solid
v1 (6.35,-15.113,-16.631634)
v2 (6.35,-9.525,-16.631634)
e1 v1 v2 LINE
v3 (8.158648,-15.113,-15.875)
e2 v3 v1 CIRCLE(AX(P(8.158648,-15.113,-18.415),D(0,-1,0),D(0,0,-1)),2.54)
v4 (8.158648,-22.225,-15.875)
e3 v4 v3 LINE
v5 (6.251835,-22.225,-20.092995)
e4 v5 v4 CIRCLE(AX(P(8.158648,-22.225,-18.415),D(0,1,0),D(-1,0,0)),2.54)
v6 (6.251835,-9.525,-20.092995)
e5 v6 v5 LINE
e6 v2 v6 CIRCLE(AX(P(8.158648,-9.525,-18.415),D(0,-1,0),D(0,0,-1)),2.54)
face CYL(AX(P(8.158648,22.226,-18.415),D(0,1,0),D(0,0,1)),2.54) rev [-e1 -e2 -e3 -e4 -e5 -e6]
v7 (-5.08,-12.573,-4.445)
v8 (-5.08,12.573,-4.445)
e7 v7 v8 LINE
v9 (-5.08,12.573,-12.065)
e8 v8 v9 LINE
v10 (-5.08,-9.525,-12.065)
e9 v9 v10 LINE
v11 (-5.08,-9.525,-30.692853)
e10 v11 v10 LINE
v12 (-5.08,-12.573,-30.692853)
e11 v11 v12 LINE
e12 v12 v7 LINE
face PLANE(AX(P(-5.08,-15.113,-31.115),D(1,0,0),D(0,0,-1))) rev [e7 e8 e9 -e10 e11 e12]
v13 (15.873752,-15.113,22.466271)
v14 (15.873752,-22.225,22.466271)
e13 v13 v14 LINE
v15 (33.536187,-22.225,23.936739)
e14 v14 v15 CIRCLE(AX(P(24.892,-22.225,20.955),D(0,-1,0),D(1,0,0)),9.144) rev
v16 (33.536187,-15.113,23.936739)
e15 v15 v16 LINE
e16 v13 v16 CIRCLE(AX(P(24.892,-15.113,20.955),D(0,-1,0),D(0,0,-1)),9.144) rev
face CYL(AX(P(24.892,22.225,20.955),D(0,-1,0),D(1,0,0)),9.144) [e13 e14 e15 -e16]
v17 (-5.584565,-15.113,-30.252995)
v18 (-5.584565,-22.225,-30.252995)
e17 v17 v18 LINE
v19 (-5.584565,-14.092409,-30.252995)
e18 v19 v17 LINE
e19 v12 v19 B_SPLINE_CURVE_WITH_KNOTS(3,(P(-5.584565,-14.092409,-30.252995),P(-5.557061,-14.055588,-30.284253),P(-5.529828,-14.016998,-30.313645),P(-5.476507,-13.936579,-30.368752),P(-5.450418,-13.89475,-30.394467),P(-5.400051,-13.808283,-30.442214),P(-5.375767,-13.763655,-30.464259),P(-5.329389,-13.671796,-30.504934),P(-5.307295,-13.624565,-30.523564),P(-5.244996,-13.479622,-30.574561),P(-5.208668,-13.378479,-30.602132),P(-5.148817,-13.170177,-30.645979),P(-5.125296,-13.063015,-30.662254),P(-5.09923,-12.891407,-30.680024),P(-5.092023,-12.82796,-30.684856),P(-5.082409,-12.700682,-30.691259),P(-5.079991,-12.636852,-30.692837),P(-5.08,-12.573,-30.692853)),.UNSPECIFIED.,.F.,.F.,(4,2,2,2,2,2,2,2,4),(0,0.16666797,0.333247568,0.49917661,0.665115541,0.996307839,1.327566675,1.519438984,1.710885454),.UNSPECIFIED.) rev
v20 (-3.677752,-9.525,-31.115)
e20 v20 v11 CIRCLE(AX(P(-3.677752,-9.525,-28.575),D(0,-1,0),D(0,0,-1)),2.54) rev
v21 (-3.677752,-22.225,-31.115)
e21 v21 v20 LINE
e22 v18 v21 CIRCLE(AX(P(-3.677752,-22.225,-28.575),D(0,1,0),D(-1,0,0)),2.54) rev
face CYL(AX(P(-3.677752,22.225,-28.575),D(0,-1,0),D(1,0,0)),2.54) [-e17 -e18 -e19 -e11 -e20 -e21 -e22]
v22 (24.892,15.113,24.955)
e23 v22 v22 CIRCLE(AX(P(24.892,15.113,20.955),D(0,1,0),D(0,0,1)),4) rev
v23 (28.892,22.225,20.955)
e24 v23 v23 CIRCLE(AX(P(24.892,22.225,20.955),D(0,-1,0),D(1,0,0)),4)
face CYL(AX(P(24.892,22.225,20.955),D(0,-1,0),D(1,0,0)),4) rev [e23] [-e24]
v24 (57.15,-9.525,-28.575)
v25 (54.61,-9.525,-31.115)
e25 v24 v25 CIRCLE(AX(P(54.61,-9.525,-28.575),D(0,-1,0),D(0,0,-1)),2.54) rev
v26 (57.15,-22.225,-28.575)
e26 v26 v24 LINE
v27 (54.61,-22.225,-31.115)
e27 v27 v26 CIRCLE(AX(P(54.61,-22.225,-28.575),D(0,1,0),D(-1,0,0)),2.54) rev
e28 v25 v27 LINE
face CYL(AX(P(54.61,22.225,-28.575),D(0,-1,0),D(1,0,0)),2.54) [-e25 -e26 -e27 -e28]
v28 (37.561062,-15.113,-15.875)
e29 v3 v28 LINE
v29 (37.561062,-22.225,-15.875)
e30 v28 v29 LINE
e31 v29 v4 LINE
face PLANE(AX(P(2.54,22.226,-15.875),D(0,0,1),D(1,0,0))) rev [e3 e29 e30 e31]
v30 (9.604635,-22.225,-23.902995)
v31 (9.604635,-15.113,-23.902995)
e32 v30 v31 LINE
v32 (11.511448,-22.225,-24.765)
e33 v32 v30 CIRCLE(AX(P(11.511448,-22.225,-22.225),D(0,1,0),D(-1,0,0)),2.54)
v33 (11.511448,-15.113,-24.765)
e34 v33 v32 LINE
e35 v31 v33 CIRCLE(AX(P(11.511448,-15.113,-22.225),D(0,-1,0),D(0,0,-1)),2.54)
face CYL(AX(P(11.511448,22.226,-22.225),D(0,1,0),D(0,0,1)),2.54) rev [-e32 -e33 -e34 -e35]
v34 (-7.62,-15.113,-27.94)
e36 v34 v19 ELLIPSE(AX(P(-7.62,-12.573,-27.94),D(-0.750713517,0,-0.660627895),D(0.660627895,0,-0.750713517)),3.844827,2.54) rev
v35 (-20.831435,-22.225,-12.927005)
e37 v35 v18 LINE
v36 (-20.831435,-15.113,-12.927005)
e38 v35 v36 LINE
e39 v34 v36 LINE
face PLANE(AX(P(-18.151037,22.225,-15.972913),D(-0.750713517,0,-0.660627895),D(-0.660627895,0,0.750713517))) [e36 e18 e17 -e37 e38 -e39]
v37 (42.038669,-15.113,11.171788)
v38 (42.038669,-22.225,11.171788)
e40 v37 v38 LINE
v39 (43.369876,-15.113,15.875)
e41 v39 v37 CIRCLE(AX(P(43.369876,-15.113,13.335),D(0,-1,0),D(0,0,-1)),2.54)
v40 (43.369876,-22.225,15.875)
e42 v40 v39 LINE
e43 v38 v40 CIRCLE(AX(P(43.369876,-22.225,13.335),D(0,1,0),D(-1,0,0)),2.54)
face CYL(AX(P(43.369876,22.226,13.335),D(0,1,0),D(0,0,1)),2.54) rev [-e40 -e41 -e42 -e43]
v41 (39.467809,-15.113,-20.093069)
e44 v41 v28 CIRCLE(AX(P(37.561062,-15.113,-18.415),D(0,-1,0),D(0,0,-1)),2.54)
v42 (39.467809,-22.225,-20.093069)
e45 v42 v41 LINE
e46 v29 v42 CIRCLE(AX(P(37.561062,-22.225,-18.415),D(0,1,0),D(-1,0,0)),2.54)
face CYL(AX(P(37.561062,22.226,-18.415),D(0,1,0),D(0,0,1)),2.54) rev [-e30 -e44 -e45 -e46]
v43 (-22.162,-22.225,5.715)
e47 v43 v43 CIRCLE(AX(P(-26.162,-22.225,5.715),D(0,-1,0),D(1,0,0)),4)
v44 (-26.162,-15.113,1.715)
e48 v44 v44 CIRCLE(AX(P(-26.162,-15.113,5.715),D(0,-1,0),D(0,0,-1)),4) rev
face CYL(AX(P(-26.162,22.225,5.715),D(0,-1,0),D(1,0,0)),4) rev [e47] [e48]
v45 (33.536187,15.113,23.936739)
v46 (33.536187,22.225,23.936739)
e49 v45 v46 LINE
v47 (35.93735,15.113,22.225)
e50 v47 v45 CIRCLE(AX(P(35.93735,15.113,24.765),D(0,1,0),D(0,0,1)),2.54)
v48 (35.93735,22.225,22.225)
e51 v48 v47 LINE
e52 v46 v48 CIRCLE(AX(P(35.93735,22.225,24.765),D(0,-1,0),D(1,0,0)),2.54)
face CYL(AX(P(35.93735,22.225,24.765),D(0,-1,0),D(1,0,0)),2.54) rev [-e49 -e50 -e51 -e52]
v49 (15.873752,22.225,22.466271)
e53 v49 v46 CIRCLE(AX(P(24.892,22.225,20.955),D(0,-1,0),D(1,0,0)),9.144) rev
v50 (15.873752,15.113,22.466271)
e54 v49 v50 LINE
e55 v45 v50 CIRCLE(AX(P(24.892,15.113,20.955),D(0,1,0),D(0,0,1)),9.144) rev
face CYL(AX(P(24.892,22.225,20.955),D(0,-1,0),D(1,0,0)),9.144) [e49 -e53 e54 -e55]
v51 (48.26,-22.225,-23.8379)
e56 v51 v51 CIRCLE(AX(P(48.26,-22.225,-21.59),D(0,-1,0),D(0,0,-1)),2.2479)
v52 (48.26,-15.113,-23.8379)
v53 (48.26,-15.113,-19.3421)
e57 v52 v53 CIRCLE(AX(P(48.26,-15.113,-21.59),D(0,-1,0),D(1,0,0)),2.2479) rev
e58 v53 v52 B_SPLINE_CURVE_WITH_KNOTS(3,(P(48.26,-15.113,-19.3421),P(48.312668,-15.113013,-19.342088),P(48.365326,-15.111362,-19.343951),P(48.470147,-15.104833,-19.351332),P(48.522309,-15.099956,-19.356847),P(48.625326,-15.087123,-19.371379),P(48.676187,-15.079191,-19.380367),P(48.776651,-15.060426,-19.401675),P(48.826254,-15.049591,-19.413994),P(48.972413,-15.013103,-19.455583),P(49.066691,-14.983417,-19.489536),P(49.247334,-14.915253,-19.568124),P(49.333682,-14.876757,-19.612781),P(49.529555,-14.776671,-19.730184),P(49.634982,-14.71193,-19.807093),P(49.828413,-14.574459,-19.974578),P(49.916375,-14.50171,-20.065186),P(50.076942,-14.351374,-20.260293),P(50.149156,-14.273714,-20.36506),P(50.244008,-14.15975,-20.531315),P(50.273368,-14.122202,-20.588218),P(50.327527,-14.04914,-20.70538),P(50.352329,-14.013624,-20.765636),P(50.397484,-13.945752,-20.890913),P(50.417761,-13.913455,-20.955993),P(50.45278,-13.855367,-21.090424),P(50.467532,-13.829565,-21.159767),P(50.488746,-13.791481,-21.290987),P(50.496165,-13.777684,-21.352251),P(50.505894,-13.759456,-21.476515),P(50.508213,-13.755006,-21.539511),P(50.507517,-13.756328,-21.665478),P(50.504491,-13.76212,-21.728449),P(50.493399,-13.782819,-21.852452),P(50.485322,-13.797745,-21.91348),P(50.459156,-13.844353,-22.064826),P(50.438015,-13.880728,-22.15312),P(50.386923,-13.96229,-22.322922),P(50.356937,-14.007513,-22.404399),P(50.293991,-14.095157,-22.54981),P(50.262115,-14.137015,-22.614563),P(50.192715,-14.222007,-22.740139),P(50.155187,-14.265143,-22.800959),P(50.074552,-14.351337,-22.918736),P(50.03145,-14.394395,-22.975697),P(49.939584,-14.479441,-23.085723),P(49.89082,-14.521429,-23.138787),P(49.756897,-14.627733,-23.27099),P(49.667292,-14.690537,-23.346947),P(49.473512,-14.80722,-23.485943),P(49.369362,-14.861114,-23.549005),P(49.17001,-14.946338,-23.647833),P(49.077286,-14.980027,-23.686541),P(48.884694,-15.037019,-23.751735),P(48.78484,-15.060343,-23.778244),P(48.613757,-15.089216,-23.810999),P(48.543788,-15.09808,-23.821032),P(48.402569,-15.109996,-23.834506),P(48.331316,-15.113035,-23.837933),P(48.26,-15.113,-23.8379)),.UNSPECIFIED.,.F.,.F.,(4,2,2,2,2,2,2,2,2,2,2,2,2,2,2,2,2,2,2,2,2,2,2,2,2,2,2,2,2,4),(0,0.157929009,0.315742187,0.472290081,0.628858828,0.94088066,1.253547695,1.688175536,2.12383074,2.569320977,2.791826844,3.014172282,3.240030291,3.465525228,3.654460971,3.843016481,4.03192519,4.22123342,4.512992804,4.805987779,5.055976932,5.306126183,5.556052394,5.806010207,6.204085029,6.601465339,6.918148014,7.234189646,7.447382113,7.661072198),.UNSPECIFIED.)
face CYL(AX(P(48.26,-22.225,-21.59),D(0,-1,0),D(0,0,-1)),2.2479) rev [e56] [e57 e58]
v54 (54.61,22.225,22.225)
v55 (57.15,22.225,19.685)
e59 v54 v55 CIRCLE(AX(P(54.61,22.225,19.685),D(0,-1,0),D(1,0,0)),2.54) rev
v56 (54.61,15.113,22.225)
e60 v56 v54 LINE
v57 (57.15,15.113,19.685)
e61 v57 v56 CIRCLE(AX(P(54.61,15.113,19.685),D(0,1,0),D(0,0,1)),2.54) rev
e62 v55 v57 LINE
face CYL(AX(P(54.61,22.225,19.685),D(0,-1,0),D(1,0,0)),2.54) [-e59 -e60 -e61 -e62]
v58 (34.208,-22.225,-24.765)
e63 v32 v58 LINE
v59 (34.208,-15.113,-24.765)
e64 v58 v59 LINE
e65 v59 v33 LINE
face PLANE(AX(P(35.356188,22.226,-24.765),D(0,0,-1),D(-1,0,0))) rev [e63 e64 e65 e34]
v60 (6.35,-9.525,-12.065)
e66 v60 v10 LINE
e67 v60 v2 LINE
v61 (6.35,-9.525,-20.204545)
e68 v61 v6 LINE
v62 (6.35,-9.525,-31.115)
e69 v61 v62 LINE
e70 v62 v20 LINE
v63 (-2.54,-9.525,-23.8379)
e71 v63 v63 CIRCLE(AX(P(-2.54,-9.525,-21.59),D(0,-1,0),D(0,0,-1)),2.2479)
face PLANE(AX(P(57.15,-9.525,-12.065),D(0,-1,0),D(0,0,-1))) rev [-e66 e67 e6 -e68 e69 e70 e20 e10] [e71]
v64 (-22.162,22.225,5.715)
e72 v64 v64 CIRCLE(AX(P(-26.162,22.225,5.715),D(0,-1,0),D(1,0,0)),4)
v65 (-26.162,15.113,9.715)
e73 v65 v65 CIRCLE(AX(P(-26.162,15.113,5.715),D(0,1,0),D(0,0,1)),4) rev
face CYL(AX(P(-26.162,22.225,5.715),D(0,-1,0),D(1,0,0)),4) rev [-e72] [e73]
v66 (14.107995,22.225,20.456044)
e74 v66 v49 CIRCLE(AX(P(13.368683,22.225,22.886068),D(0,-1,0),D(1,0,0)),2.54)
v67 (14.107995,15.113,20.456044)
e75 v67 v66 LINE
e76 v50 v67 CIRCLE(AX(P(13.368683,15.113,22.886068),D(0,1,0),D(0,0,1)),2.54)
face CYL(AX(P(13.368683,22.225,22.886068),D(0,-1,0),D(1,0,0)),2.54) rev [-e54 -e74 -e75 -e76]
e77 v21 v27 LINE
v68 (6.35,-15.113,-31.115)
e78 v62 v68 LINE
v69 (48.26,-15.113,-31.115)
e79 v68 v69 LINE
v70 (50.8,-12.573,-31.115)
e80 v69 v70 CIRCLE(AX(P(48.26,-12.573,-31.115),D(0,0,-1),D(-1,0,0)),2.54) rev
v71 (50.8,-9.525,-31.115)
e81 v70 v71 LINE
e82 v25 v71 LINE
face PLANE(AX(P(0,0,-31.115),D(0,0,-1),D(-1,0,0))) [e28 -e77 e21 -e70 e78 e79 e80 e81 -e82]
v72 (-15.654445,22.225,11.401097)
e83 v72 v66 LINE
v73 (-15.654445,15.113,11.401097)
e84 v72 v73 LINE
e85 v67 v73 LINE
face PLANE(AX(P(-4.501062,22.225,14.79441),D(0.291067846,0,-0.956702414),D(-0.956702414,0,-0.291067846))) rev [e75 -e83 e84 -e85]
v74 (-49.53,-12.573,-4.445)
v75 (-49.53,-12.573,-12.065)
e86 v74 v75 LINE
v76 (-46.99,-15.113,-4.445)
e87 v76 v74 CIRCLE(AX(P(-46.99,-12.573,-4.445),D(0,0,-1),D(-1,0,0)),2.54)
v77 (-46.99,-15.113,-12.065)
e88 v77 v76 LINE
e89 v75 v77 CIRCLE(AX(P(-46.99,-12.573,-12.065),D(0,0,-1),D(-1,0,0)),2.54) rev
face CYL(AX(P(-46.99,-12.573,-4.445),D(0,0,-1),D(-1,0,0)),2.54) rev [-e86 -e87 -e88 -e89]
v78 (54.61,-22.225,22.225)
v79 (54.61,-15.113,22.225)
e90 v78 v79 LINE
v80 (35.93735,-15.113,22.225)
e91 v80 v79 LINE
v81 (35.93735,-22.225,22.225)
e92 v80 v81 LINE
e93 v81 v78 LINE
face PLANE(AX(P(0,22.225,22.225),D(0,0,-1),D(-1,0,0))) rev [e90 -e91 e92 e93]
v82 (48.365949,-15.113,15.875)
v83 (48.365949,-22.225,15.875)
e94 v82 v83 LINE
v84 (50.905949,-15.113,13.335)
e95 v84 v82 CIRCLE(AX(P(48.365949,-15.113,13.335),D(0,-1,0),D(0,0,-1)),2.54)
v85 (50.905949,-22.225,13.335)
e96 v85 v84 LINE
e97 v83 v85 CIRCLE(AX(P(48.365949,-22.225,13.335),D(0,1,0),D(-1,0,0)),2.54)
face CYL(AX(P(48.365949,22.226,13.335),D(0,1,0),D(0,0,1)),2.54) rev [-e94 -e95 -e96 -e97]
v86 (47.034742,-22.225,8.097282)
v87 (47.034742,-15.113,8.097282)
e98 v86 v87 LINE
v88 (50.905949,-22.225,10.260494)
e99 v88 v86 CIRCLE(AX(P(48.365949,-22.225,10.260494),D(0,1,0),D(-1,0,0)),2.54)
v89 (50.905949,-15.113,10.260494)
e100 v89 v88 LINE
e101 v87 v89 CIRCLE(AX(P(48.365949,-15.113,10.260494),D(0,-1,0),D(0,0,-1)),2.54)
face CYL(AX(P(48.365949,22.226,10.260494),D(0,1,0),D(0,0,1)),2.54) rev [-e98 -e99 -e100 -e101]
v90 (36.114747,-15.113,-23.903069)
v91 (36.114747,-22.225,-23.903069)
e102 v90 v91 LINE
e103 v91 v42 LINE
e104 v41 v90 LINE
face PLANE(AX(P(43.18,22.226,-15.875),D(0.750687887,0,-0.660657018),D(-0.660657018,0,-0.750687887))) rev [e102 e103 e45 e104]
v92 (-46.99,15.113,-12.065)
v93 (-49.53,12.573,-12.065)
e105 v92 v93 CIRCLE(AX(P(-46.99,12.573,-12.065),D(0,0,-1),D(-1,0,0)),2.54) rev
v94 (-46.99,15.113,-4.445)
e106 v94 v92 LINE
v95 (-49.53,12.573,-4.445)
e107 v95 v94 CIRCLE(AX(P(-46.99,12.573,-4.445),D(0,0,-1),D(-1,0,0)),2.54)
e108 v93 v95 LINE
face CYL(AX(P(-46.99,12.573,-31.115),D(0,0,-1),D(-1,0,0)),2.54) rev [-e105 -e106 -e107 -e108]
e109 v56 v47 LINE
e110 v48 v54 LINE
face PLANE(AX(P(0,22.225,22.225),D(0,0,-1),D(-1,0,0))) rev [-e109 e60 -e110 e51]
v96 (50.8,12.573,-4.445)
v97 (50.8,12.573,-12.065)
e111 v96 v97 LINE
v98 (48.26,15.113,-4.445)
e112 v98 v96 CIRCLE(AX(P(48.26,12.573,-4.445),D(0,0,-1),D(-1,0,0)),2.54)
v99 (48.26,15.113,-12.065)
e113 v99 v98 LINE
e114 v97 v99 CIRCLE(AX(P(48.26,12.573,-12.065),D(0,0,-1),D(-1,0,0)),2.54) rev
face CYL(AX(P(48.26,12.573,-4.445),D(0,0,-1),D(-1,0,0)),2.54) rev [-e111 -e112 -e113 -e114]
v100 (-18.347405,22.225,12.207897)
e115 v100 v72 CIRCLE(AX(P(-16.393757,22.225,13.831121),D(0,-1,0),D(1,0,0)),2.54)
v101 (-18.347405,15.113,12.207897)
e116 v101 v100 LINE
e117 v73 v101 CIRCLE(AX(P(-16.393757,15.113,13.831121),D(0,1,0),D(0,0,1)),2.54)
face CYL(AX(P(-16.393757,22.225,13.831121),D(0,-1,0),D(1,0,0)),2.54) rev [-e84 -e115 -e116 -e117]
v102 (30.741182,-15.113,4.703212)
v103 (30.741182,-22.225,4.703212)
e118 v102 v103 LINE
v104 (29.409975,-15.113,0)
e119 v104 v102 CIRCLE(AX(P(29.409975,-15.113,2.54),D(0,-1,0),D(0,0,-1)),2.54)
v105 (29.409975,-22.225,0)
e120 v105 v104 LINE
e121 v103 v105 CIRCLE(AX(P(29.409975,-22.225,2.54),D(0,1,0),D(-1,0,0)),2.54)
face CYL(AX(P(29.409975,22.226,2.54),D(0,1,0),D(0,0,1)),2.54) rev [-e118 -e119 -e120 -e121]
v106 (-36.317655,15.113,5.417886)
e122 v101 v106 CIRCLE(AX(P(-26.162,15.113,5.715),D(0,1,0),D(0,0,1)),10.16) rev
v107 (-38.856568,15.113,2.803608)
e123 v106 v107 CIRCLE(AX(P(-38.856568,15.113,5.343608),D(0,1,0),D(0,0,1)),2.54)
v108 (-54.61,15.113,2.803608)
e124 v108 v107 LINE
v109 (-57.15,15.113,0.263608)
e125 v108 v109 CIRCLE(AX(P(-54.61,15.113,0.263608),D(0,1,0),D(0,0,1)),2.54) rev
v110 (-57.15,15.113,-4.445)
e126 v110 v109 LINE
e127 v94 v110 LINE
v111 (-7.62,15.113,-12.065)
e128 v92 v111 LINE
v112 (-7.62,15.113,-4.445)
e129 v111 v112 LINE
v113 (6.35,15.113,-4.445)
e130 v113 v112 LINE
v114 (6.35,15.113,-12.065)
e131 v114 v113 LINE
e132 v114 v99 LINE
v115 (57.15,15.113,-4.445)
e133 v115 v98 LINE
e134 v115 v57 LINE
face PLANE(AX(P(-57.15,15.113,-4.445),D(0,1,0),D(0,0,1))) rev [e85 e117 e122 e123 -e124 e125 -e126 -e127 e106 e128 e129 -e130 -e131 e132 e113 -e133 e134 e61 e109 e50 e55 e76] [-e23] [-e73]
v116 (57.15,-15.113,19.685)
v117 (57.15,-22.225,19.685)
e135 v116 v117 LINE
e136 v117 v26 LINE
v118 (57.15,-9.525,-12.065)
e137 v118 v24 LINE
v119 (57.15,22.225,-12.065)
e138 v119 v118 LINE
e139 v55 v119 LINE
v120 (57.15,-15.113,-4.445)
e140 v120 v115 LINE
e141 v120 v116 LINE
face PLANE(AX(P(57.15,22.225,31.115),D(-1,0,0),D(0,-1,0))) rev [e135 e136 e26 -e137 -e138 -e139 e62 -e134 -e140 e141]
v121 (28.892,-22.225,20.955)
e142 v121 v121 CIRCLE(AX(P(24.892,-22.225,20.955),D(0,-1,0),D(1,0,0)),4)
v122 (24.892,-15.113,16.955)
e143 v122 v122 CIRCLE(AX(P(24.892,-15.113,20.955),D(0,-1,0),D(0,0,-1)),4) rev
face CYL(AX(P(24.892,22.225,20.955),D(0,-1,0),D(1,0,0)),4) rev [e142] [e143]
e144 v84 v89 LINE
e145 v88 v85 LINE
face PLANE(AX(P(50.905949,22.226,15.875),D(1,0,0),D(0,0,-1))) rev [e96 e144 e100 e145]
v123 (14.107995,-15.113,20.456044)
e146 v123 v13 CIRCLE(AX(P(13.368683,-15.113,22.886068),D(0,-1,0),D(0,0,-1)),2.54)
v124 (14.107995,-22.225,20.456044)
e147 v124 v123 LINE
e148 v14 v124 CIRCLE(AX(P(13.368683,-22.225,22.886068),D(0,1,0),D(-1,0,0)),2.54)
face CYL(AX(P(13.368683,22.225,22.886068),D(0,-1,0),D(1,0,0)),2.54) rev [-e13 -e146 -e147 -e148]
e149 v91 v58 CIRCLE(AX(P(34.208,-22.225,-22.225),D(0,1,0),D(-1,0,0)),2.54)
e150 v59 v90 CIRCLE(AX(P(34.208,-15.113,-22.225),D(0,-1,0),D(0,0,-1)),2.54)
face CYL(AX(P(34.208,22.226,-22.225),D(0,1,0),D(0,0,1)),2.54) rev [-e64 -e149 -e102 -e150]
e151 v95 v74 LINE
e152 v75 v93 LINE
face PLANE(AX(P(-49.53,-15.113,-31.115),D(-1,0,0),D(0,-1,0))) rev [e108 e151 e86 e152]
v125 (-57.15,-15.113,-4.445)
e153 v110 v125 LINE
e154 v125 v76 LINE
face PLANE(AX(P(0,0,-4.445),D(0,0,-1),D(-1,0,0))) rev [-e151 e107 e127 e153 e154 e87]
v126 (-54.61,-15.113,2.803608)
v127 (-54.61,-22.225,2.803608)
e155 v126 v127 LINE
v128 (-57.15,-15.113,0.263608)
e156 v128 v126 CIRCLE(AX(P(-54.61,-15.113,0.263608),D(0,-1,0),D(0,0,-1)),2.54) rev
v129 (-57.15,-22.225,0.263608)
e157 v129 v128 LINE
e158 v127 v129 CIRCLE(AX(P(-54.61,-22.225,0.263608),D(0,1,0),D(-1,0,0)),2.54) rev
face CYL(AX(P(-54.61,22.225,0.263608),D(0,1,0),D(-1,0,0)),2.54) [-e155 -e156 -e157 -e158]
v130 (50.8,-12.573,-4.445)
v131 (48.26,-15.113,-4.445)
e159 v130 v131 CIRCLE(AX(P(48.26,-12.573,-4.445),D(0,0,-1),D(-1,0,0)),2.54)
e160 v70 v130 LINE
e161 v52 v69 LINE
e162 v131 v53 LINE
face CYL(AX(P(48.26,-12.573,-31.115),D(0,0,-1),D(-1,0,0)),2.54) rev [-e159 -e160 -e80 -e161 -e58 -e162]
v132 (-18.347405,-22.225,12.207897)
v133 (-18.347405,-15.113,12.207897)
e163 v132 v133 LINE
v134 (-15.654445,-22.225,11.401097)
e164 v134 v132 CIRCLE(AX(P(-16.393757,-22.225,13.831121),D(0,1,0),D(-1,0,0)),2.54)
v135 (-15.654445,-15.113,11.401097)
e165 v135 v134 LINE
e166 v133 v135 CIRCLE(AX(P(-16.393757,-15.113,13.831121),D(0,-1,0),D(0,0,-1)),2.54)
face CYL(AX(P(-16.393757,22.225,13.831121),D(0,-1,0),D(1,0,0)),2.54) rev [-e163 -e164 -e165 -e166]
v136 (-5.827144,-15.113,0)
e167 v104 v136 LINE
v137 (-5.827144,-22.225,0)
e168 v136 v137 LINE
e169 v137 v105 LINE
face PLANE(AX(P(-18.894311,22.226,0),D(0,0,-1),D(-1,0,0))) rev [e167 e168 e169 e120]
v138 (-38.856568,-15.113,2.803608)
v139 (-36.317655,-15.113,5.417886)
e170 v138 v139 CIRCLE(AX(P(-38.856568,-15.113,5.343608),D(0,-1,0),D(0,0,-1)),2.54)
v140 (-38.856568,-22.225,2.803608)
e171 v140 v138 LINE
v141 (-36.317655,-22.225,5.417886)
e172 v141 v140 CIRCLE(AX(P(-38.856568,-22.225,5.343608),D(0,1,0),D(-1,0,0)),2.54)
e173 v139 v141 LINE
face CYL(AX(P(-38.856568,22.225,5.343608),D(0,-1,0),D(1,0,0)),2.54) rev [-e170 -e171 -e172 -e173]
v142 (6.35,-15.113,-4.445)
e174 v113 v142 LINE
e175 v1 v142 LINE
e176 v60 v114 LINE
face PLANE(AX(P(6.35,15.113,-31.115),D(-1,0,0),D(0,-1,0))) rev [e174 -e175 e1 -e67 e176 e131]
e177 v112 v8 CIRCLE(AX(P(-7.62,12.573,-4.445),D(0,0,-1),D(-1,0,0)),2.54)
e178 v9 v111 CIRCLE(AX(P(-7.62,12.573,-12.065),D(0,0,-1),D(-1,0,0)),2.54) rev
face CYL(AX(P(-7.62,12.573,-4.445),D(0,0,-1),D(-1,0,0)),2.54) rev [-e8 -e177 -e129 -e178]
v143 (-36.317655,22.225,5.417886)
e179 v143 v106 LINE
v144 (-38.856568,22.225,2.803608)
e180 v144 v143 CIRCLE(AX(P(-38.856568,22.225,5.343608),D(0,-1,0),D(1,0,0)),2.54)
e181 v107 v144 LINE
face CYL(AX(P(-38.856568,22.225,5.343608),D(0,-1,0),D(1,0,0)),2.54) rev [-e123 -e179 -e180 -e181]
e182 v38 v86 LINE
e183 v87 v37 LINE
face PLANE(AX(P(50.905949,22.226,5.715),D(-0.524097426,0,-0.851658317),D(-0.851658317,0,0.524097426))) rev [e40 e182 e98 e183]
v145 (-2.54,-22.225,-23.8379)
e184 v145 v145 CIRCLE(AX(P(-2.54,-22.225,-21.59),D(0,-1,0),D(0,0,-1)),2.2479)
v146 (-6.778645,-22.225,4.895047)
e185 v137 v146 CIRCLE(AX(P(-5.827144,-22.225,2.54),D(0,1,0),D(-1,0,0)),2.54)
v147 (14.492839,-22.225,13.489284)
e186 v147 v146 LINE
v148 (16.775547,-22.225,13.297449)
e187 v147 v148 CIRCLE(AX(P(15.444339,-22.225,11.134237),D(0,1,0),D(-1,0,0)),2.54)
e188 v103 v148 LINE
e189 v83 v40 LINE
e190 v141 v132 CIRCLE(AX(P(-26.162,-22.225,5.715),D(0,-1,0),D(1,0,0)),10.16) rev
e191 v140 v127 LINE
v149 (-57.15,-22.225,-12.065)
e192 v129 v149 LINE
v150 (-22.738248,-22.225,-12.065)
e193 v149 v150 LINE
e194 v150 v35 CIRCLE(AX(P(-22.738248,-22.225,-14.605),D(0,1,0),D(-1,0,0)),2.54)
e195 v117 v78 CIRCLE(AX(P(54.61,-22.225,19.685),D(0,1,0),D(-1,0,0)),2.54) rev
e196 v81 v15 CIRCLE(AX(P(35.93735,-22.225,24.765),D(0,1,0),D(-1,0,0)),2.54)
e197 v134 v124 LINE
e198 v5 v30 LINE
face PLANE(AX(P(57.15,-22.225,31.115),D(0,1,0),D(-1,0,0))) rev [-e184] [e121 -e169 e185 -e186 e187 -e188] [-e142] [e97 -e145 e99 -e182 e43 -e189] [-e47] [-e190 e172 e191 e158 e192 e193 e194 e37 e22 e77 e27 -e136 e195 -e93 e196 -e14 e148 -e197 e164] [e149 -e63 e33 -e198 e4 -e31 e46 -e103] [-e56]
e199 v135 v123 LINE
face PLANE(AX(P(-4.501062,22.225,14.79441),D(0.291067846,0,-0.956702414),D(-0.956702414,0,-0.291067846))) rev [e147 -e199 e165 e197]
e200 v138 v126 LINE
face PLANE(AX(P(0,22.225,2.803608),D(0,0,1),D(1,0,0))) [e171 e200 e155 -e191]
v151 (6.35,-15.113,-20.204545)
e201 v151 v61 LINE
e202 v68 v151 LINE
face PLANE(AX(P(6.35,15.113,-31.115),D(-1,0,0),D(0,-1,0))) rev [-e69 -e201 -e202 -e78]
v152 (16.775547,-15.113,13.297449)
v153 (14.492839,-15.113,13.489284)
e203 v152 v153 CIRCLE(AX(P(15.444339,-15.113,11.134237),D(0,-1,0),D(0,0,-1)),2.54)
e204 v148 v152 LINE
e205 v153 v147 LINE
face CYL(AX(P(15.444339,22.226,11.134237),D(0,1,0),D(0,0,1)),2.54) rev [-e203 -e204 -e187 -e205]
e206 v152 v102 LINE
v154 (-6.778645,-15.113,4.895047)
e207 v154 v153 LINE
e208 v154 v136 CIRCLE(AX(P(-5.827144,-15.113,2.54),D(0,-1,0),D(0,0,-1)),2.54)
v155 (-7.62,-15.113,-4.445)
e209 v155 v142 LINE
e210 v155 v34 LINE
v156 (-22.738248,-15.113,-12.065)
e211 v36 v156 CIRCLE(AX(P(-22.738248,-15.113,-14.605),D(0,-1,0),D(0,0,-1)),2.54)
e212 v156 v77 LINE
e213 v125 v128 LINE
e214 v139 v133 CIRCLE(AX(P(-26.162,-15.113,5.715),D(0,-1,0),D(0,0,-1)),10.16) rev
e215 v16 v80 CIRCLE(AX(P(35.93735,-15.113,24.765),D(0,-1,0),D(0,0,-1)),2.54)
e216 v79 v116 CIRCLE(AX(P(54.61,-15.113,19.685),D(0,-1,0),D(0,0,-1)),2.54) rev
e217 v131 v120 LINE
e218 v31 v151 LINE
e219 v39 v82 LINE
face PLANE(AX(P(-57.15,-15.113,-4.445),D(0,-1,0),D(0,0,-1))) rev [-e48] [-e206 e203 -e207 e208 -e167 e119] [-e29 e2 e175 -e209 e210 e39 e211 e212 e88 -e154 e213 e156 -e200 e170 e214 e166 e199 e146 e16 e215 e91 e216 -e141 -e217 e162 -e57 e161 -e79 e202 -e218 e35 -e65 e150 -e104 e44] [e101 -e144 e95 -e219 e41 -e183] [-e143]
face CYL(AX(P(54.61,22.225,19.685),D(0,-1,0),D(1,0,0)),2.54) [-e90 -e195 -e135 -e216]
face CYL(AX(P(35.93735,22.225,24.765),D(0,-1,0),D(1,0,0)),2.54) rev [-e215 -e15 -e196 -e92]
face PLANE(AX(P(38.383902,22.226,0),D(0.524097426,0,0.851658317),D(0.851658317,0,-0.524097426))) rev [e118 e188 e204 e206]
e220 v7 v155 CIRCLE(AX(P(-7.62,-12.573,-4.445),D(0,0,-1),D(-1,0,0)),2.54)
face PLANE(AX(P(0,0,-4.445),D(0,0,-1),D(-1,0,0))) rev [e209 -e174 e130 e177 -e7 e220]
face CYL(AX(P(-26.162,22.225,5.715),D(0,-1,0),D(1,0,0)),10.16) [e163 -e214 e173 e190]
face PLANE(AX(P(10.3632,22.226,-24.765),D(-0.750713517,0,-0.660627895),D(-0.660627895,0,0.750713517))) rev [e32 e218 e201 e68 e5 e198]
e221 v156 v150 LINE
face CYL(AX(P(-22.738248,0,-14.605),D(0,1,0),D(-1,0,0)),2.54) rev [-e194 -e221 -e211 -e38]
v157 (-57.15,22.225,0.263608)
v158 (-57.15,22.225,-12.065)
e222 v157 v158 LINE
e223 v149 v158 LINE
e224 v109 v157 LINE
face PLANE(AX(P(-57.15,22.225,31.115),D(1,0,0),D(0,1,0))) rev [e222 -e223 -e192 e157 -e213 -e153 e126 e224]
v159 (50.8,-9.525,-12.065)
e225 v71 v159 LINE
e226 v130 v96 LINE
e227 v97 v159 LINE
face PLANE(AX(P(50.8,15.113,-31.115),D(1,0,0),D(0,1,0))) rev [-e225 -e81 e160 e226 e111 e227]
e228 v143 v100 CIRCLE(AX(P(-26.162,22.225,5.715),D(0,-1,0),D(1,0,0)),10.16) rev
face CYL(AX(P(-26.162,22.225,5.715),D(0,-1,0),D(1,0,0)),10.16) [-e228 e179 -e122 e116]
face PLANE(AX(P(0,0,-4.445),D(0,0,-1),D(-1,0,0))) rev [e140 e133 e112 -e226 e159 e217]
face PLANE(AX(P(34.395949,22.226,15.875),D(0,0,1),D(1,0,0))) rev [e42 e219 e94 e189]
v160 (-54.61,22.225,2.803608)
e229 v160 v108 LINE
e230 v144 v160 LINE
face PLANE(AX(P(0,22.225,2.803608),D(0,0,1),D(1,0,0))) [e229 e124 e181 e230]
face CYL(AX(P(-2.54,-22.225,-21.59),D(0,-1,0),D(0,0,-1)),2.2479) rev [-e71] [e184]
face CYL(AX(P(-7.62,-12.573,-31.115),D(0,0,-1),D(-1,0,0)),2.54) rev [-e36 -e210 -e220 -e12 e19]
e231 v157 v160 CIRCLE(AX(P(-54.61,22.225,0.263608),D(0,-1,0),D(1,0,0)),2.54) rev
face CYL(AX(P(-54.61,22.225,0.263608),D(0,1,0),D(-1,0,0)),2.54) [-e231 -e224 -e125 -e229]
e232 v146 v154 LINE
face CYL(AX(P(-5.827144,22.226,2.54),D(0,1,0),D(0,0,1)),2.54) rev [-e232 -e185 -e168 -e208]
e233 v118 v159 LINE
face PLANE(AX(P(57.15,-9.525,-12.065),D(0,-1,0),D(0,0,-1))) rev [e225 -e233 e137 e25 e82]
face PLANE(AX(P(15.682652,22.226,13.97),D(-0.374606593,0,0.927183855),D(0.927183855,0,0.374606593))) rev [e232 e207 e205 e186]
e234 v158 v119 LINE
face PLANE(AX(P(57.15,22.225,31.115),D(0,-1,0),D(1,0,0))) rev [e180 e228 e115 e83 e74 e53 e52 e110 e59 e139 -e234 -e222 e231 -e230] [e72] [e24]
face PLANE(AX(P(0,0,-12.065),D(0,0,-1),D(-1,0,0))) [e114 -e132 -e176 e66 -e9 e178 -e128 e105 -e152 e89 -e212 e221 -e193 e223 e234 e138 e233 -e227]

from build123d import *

# Parameters (mm, degrees)
SKETCH1_W                  = 114.3
SKETCH1_H                  = 44.45
BOSS_EXTRUDE1_DEPTH        = 31.115
SKETCH3_R                  = 4
PIVOT_POINTS_DEPTH         = 79.803986098
SKETCH4_W                  = 114.3
SKETCH4_H                  = 30.226
TOP_CUTOUT_DEPTH           = 35.56
SKETCH5_W                  = 114.3
SKETCH5_H                  = 31.75
BOTTOM_CUTOUT_DEPTH        = 19.05
SIDE_PROFILE_CUT_DEPTH     = 79.803986098
F_8_CLEARANCE_HOLE1_D      = 4.4958
OPTIMIZATION_CUTOUTS_DEPTH = 12.7
SKETCH12_W                 = 44.45
SKETCH12_H                 = 30.226
CUT_EXTRUDE7_DEPTH         = 71.380118364
FILLET2_R                  = 2.54


with BuildPart() as part:
    # Sketch1 → Boss-Extrude1 (new, symmetric)
    with BuildSketch(Plane.XY):
        Rectangle(SKETCH1_W, SKETCH1_H)
    extrude(amount=BOSS_EXTRUDE1_DEPTH, both=True)

    # Sketch3 → Pivot Points (cut, through all)
    with BuildSketch(Plane.XZ.offset(22.225)):
        with Locations((-26.162, 5.715)):
            Circle(SKETCH3_R)
        with Locations((24.892, 20.955)):
            Circle(SKETCH3_R)
    extrude(amount=-PIVOT_POINTS_DEPTH, mode=Mode.SUBTRACT)

    # Sketch4 → Top Cutout (cut)
    with BuildSketch(Plane.XY.offset(31.115)):
        Rectangle(SKETCH4_W, SKETCH4_H)
    extrude(amount=-TOP_CUTOUT_DEPTH, mode=Mode.SUBTRACT)

    # Sketch5 → Bottom Cutout (cut)
    with BuildSketch(Plane(origin=(0, 0, -31.115), x_dir=(-1, 0, 0), z_dir=(0, 0, -1))):
        with Locations((0, 6.35)):
            Rectangle(SKETCH5_W, SKETCH5_H)
    extrude(amount=-BOTTOM_CUTOUT_DEPTH, mode=Mode.SUBTRACT)

    # Sketch6 → Side Profile Cut (cut, through all)
    with BuildSketch(Plane.XZ.offset(22.225)):
        with BuildLine():
            ThreePointArc((-35.89593012, 2.803607822), (-30.223846998, 15.027733163), (-17.405875711, 10.868240479))
            Line((-17.405875711, 10.868240479), (15.748, 20.955))
            ThreePointArc((15.748, 20.955), (24.255455776, 30.076817113), (33.947376083, 22.225))
            Line((33.947376083, 22.225), (57.15, 22.225))
            Line((57.15, 22.225), (57.15, 31.115))
            Line((57.15, 31.115), (-57.15, 31.115))
            Line((-57.15, 31.115), (-57.15, 2.803607822))
            Line((-57.15, 2.803607822), (-35.89593012, 2.803607822))
        make_face()
        Polygon((-21.59, -12.065), (-57.15, -12.065), (-57.15, -31.115), (-4.826, -31.115), align=None)
    extrude(amount=-SIDE_PROFILE_CUT_DEPTH, mode=Mode.SUBTRACT)

    # #8 Clearance Hole1 (through all)
    with Locations(Plane(origin=(0, -22.225, 0), x_dir=(-1, 0, 0), z_dir=(0, -1, 0))):
        with Locations((2.54, 21.59), (-48.26, 21.59)):
            Hole(F_8_CLEARANCE_HOLE1_D / 2)

    # Sketch10 → optimization cutouts (cut)
    with BuildSketch(Plane.XZ.offset(22.225)):
        Polygon((34.395949285, 15.875), (50.905949285, 15.875), (50.905949285, 5.715), align=None)
        Polygon((2.54, -15.875), (43.18, -15.875), (35.356188013, -24.765), (10.3632, -24.765), align=None)
        Polygon((-18.894311293, 0), (38.383902049, 0), (15.682652049, 13.97), align=None)
    extrude(amount=-OPTIMIZATION_CUTOUTS_DEPTH, mode=Mode.SUBTRACT)

    # Sketch12 → Cut-Extrude7 (cut, through all)
    with BuildSketch(Plane.XY.offset(-4.445)):
        with Locations((28.575, 0)):
            Rectangle(SKETCH12_W, SKETCH12_H)
        with Locations((-27.305, 0)):
            Rectangle(SKETCH12_W, SKETCH12_H)
    extrude(amount=-CUT_EXTRUDE7_DEPTH, mode=Mode.SUBTRACT)

    # Fillet2
    # the kernel refuses this fillet: 2.54 mm, written as the material it adds along each edge
    with BuildSketch(Plane(origin=(33.947376083, 15.113, 22.225), x_dir=(1, 0, 0), z_dir=(0, 1, 0)), Plane(origin=(33.947376083, -22.225, 22.225), x_dir=(1, 0, 0), z_dir=(0, 1, 0))) as fillet2_piece_1:
        with BuildLine():
            CenterArc((1.989973889, -2.54), FILLET2_R, 90, 70.968559075)
            ThreePointArc((-0.411189148, -1.71173913), (-0.164304974, -0.865788037), (0, 0))
            Line((0, 0), (1.989973889, 0))
        make_face()
    extrude(amount=7.112)
    with BuildSketch(Plane(origin=(15.748, 15.113, 20.955), x_dir=(-0.9567024140899113, 0, -0.2910678458272846), z_dir=(0, 1, 0))) as fillet2_piece_2:
        with BuildLine():
            CenterArc((1.71422645, 2.54), FILLET2_R, 206.435081656, 63.564918344)
            ThreePointArc((-0.56018949, 1.40923383), (-0.250829923, 0.716250077), (0, 0))
            Line((0, 0), (1.71422645, 0))
        make_face()
    extrude(amount=7.112)
    with BuildSketch(Plane(origin=(15.748, -22.225, 20.955), x_dir=(0.08292286781363219, 0, 0.996555968319674), z_dir=(0, 1, 0))) as fillet2_piece_3:
        with BuildLine():
            CenterArc((1.727117491, -2.53125216), FILLET2_R, 94.756592224, 63.564918344)
            Line((-0.633231662, -1.592981476), (0, 0))
            ThreePointArc((0, 0), (0.758246703, -0.031492226), (1.516493407, 0))
        make_face()
    extrude(amount=7.112)
    with BuildSketch(Plane(origin=(-21.59, -22.225, -12.065), x_dir=(-1, 0, 0), z_dir=(0, 1, 0))) as fillet2_piece_4:
        with BuildLine():
            CenterArc((FILLET2_R * 0.452066064428, -FILLET2_R), FILLET2_R, 90, 48.65222278)
            Line((-FILLET2_R * 0.298647452495, -FILLET2_R * 0.339372105108), (0, 0))
            Line((0, 0), (FILLET2_R * 0.452066064428, 0))
        make_face()
    extrude(amount=7.112)
    with BuildSketch(Plane(origin=(-18.894311293, -22.225, 0), x_dir=(1, 0, 0), z_dir=(0, 1, 0))) as fillet2_piece_5:
        with BuildLine():
            CenterArc((FILLET2_R * 5.14455401597, -FILLET2_R), FILLET2_R, 90, 158)
            Line((FILLET2_R * 4.76994742255, -FILLET2_R * 1.92718385457), (0, 0))
            Line((0, 0), (FILLET2_R * 5.14455401597, 0))
        make_face()
    extrude(amount=7.112)
    with BuildSketch(Plane(origin=(38.383902049, -22.225, 0), x_dir=(-1, 0, 0), z_dir=(0, 1, 0))) as fillet2_piece_6:
        with BuildLine():
            CenterArc((FILLET2_R * 3.53304219031, FILLET2_R), FILLET2_R, 121.607502246, 148.392497754)
            Line((FILLET2_R * 3.00894476464, FILLET2_R * 1.8516583167), (0, 0))
            Line((0, 0), (FILLET2_R * 3.53304219031, 0))
        make_face()
    extrude(amount=7.112)
    with BuildSketch(Plane(origin=(15.682652049, -22.225, 13.97), x_dir=(0.8516583167045444, 0, -0.5240974256643338), z_dir=(0, 1, 0))) as fillet2_piece_7:
        with BuildLine():
            CenterArc((FILLET2_R * 0.50521852562, FILLET2_R), FILLET2_R, 216.392497754, 53.607502246)
            Line((-FILLET2_R * 0.299752966451, FILLET2_R * 0.40668651039), (0, 0))
            Line((0, 0), (FILLET2_R * 0.50521852562, 0))
        make_face()
    extrude(amount=7.112)
    with BuildSketch(Plane(origin=(35.356188013, -22.225, -24.765), x_dir=(-1, 0, 0), z_dir=(0, 1, 0))) as fillet2_piece_8:
        with BuildLine():
            CenterArc((FILLET2_R * 0.452042703087, FILLET2_R), FILLET2_R, 221.35, 48.65)
            Line((-FILLET2_R * 0.298645184321, FILLET2_R * 0.339342981798), (0, 0))
            Line((0, 0), (FILLET2_R * 0.452042703087, 0))
        make_face()
    extrude(amount=7.112)
    with BuildSketch(Plane(origin=(43.18, -22.225, -15.875), x_dir=(-0.6606570182018219, 0, -0.7506878874077278), z_dir=(0, 1, 0))) as fillet2_piece_9:
        with BuildLine():
            CenterArc((FILLET2_R * 2.2121803829, FILLET2_R), FILLET2_R, 138.65, 131.35)
            Line((FILLET2_R * 1.46149249549, FILLET2_R * 1.6606570182), (0, 0))
            Line((0, 0), (FILLET2_R * 2.2121803829, 0))
        make_face()
    extrude(amount=7.112)
    with BuildSketch(Plane(origin=(2.54, -22.225, -15.875), x_dir=(0.6606278948920252, 0, -0.7507135169227549), z_dir=(0, 1, 0))) as fillet2_piece_10_section:
        with BuildLine():
            CenterArc((FILLET2_R * 2.21206606443, -FILLET2_R), FILLET2_R, 90, 131.34777722)
            Line((FILLET2_R * 1.4613525475, -FILLET2_R * 1.66062789489), (0, 0))
            Line((0, 0), (FILLET2_R * 2.21206606443, 0))
        make_face()
    fillet2_piece_10 = extrude(amount=12.7, mode=Mode.PRIVATE)
    fillet2_piece_10 = split(fillet2_piece_10, bisect_by=Plane(origin=(4.780641992, -15.113, -17.020766016), z_dir=(0, -1, 0)), keep=Keep.TOP, mode=Mode.PRIVATE)
    fillet2_piece_10 = split(fillet2_piece_10, bisect_by=Plane(origin=(6.35, -18.669, -17.020766016), z_dir=(-1, 0, 0)), keep=Keep.TOP, mode=Mode.PRIVATE)
    add(fillet2_piece_10)
    with BuildSketch(Plane(origin=(2.54, -22.225, -15.875), x_dir=(0.6606278948920252, 0, -0.7507135169227549), z_dir=(0, 1, 0))) as fillet2_piece_11_section:
        with BuildLine():
            CenterArc((FILLET2_R * 2.21206606443, -FILLET2_R), FILLET2_R, 90, 131.34777722)
            Line((FILLET2_R * 1.4613525475, -FILLET2_R * 1.66062789489), (0, 0))
            Line((0, 0), (FILLET2_R * 2.21206606443, 0))
        make_face()
    fillet2_piece_11 = extrude(amount=12.7, mode=Mode.PRIVATE)
    fillet2_piece_11 = split(fillet2_piece_11, bisect_by=Plane(origin=(6.870553853, -15.113, -16.051154706), z_dir=(0, -1, 0)), keep=Keep.TOP, mode=Mode.PRIVATE)
    fillet2_piece_11 = split(fillet2_piece_11, bisect_by=Plane(origin=(6.35, -18.669, -16.051154706), z_dir=(1, 0, 0)), keep=Keep.TOP, mode=Mode.PRIVATE)
    add(fillet2_piece_11)
    with BuildSketch(Plane(origin=(2.54, -22.225, -15.875), x_dir=(0.6606278948920252, 0, -0.7507135169227549), z_dir=(0, 1, 0))) as fillet2_piece_12_section:
        with BuildLine():
            CenterArc((FILLET2_R * 2.21206606443, -FILLET2_R), FILLET2_R, 90, 131.34777722)
            Line((FILLET2_R * 1.4613525475, -FILLET2_R * 1.66062789489), (0, 0))
            Line((0, 0), (FILLET2_R * 2.21206606443, 0))
        make_face()
    fillet2_piece_12 = extrude(amount=12.7, mode=Mode.PRIVATE)
    fillet2_piece_12 = split(fillet2_piece_12, bisect_by=Plane(origin=(4.780641992, -15.113, -17.020766016), z_dir=(0, 1, 0)), keep=Keep.TOP, mode=Mode.PRIVATE)
    fillet2_piece_12 = split(fillet2_piece_12, bisect_by=Plane(origin=(6.35, -12.319, -17.020766016), z_dir=(-1, 0, 0)), keep=Keep.TOP, mode=Mode.PRIVATE)
    add(fillet2_piece_12)
    with BuildSketch(Plane(origin=(10.3632, -22.225, -24.765), x_dir=(-0.6606278948920246, 0, 0.7507135169227555), z_dir=(0, 1, 0))) as fillet2_piece_13:
        with BuildLine():
            CenterArc((FILLET2_R * 0.452066064428, FILLET2_R), FILLET2_R, 221.34777722, 48.65222278)
            Line((-FILLET2_R * 0.298647452495, FILLET2_R * 0.339372105108), (0, 0))
            Line((0, 0), (FILLET2_R * 0.452066064428, 0))
        make_face()
    extrude(amount=7.112)
    with BuildSketch(Plane(origin=(50.905949285, -22.225, 15.875), x_dir=(0, 0, -1), z_dir=(0, 1, 0))) as fillet2_piece_14:
        with BuildLine():
            CenterArc((FILLET2_R, FILLET2_R), FILLET2_R, 180, 90)
            Line((0, FILLET2_R), (0, 0))
            Line((0, 0), (FILLET2_R, 0))
        make_face()
    extrude(amount=7.112)
    with BuildSketch(Plane(origin=(34.395949285, -22.225, 15.875), x_dir=(0.851658316704544, 0, -0.5240974256643346), z_dir=(0, 1, 0))) as fillet2_piece_15:
        with BuildLine():
            CenterArc((FILLET2_R * 3.53304219031, -FILLET2_R), FILLET2_R, 90, 148.392497754)
            Line((FILLET2_R * 3.00894476464, -FILLET2_R * 1.8516583167), (0, 0))
            Line((0, 0), (FILLET2_R * 3.53304219031, 0))
        make_face()
    extrude(amount=7.112)
    with BuildSketch(Plane(origin=(50.905949285, -22.225, 5.715), x_dir=(-0.8516583167045437, 0, 0.5240974256643349), z_dir=(0, 1, 0))) as fillet2_piece_16:
        with BuildLine():
            CenterArc((FILLET2_R * 1.78956442481, FILLET2_R), FILLET2_R, 148.392497754, 121.607502246)
            Line((FILLET2_R * 0.937906108101, FILLET2_R * 1.52409742566), (0, 0))
            Line((0, 0), (FILLET2_R * 1.78956442481, 0))
        make_face()
    extrude(amount=7.112)
    with BuildSketch(Plane(origin=(-17.405875711, -22.225, 10.868240479), x_dir=(-0.5750066168116974, 0, 0.818148758248013), z_dir=(0, 1, 0)), Plane(origin=(-17.405875711, 15.113, 10.868240479), x_dir=(-0.5750066168116988, 0, 0.818148758248012), z_dir=(0, 1, 0))) as fillet2_piece_17:
        with BuildLine():
            CenterArc((1.842102236, 2.531739897), FILLET2_R, 198.178198368, 67.199787488)
            Line((-0.571128471, 1.739327406), (0, 0))
            ThreePointArc((0, 0), (0.818712105, 0.033040412), (1.63742421, 0))
        make_face()
    extrude(amount=7.112)
    with BuildSketch(Plane(origin=(-35.89593012, 15.113, 2.803607822), x_dir=(-1, 0, 0), z_dir=(0, 1, 0)), Plane(origin=(-35.89593012, -22.225, 2.803607822), x_dir=(-1, 0, 0), z_dir=(0, 1, 0))) as fillet2_piece_18:
        with BuildLine():
            CenterArc((2.960638319, 2.54), FILLET2_R, 178.324233192, 91.675766808)
            ThreePointArc((0.421724631, 2.614278436), (0.296399362, 1.293340734), (0, 0))
            Line((0, 0), (2.960638319, 0))
        make_face()
    extrude(amount=7.112)
    with BuildSketch(Plane(origin=(50.8, -15.113, -4.445), x_dir=(-1, 0, 0), z_dir=(0, 0, -1))) as fillet2_piece_19_section:
        with BuildLine():
            CenterArc((FILLET2_R, FILLET2_R), FILLET2_R, 180, 90)
            Line((0, FILLET2_R), (0, 0))
            Line((0, 0), (FILLET2_R, 0))
        make_face()
    fillet2_piece_19 = extrude(amount=26.67, mode=Mode.PRIVATE)
    fillet2_piece_19 = fillet2_piece_19 - Plane(origin=(48.26, -14.517421037, -21.59), x_dir=(1, 0, 0), z_dir=(0, 1, 0)) * Cylinder(2.2479, 64, mode=Mode.PRIVATE)
    add(fillet2_piece_19)
    with BuildSketch(Plane(origin=(-5.08, -15.113, -4.445), x_dir=(-1, 0, 0), z_dir=(0, 0, -1))) as fillet2_piece_20_section:
        with BuildLine():
            CenterArc((FILLET2_R, FILLET2_R), FILLET2_R, 180, 90)
            Line((0, FILLET2_R), (0, 0))
            Line((0, 0), (FILLET2_R, 0))
        make_face()
    fillet2_piece_20 = extrude(amount=32.731363636, mode=Mode.PRIVATE)
    fillet2_piece_20 = split(fillet2_piece_20, bisect_by=Plane(origin=(-12.025309715, -14.53013241, -22.933966233), z_dir=(0.7507135169227551, 0, 0.6606278948920249)), keep=Keep.TOP, mode=Mode.PRIVATE)
    add(fillet2_piece_20)
    with BuildSketch(Plane(origin=(50.8, 15.113, -4.445), x_dir=(-1, 0, 0), z_dir=(0, 0, -1)), Plane(origin=(-5.08, 15.113, -4.445), x_dir=(-1, 0, 0), z_dir=(0, 0, -1)), Plane(origin=(-49.53, -15.113, -4.445), x_dir=(1, 0, 0), z_dir=(0, 0, -1))) as fillet2_piece_21:
        with BuildLine():
            CenterArc((FILLET2_R, -FILLET2_R), FILLET2_R, 90, 90)
            Line((0, -FILLET2_R), (0, 0))
            Line((0, 0), (FILLET2_R, 0))
        make_face()
    extrude(amount=7.62)
    with BuildSketch(Plane(origin=(-49.53, 15.113, -4.445), x_dir=(1, 0, 0), z_dir=(0, 0, -1))) as fillet2_piece_22:
        with BuildLine():
            CenterArc((FILLET2_R, FILLET2_R), FILLET2_R, 180, 90)
            Line((0, FILLET2_R), (0, 0))
            Line((0, 0), (FILLET2_R, 0))
        make_face()
    extrude(amount=7.62)
    # the kernel refuses this fillet: 2.54 mm, written as the material it takes off along each edge
    with BuildSketch(Plane(origin=(57.15, 8.763, 22.225), x_dir=(0, 0, -1), z_dir=(0, 1, 0)), Plane(origin=(-57.15, 8.763, 2.803607822), x_dir=(1, 0, 0), z_dir=(0, 1, 0)), Plane(origin=(-57.15, -28.575, 2.803607822), x_dir=(1, 0, 0), z_dir=(0, 1, 0))) as fillet2_2_piece_1:
        with BuildLine():
            CenterArc((FILLET2_R, FILLET2_R), FILLET2_R, 180, 90)
            Line((0, FILLET2_R), (0, 0))
            Line((0, 0), (FILLET2_R, 0))
        make_face()
    extrude(amount=19.812, mode=Mode.SUBTRACT)
    with BuildSketch(Plane(origin=(57.15, -28.575, 22.225), x_dir=(-1, 0, 0), z_dir=(0, 1, 0))) as fillet2_2_piece_2:
        with BuildLine():
            CenterArc((FILLET2_R, -FILLET2_R), FILLET2_R, 90, 90)
            Line((0, -FILLET2_R), (0, 0))
            Line((0, 0), (FILLET2_R, 0))
        make_face()
    extrude(amount=19.812, mode=Mode.SUBTRACT)
    with BuildSketch(Plane(origin=(57.15, -28.575, -31.115), x_dir=(-1, 0, 0), z_dir=(0, 1, 0))) as fillet2_2_piece_3:
        with BuildLine():
            CenterArc((FILLET2_R, FILLET2_R), FILLET2_R, 180, 90)
            Line((0, FILLET2_R), (0, 0))
            Line((0, 0), (FILLET2_R, 0))
        make_face()
    extrude(amount=25.4, mode=Mode.SUBTRACT)
    with BuildSketch(Plane(origin=(-4.826, -25.095619509, -31.115), x_dir=(1, 0, 0), z_dir=(0, 1, 0))) as fillet2_2_piece_4:
        with BuildLine():
            CenterArc((FILLET2_R * 0.452066064428, -FILLET2_R), FILLET2_R, 90, 48.65222278)
            Line((-FILLET2_R * 0.298647452495, -FILLET2_R * 0.339372105108), (0, 0))
            Line((0, 0), (FILLET2_R * 0.452066064428, 0))
        make_face()
    extrude(amount=18.441239018, mode=Mode.SUBTRACT)


solid = part.part
